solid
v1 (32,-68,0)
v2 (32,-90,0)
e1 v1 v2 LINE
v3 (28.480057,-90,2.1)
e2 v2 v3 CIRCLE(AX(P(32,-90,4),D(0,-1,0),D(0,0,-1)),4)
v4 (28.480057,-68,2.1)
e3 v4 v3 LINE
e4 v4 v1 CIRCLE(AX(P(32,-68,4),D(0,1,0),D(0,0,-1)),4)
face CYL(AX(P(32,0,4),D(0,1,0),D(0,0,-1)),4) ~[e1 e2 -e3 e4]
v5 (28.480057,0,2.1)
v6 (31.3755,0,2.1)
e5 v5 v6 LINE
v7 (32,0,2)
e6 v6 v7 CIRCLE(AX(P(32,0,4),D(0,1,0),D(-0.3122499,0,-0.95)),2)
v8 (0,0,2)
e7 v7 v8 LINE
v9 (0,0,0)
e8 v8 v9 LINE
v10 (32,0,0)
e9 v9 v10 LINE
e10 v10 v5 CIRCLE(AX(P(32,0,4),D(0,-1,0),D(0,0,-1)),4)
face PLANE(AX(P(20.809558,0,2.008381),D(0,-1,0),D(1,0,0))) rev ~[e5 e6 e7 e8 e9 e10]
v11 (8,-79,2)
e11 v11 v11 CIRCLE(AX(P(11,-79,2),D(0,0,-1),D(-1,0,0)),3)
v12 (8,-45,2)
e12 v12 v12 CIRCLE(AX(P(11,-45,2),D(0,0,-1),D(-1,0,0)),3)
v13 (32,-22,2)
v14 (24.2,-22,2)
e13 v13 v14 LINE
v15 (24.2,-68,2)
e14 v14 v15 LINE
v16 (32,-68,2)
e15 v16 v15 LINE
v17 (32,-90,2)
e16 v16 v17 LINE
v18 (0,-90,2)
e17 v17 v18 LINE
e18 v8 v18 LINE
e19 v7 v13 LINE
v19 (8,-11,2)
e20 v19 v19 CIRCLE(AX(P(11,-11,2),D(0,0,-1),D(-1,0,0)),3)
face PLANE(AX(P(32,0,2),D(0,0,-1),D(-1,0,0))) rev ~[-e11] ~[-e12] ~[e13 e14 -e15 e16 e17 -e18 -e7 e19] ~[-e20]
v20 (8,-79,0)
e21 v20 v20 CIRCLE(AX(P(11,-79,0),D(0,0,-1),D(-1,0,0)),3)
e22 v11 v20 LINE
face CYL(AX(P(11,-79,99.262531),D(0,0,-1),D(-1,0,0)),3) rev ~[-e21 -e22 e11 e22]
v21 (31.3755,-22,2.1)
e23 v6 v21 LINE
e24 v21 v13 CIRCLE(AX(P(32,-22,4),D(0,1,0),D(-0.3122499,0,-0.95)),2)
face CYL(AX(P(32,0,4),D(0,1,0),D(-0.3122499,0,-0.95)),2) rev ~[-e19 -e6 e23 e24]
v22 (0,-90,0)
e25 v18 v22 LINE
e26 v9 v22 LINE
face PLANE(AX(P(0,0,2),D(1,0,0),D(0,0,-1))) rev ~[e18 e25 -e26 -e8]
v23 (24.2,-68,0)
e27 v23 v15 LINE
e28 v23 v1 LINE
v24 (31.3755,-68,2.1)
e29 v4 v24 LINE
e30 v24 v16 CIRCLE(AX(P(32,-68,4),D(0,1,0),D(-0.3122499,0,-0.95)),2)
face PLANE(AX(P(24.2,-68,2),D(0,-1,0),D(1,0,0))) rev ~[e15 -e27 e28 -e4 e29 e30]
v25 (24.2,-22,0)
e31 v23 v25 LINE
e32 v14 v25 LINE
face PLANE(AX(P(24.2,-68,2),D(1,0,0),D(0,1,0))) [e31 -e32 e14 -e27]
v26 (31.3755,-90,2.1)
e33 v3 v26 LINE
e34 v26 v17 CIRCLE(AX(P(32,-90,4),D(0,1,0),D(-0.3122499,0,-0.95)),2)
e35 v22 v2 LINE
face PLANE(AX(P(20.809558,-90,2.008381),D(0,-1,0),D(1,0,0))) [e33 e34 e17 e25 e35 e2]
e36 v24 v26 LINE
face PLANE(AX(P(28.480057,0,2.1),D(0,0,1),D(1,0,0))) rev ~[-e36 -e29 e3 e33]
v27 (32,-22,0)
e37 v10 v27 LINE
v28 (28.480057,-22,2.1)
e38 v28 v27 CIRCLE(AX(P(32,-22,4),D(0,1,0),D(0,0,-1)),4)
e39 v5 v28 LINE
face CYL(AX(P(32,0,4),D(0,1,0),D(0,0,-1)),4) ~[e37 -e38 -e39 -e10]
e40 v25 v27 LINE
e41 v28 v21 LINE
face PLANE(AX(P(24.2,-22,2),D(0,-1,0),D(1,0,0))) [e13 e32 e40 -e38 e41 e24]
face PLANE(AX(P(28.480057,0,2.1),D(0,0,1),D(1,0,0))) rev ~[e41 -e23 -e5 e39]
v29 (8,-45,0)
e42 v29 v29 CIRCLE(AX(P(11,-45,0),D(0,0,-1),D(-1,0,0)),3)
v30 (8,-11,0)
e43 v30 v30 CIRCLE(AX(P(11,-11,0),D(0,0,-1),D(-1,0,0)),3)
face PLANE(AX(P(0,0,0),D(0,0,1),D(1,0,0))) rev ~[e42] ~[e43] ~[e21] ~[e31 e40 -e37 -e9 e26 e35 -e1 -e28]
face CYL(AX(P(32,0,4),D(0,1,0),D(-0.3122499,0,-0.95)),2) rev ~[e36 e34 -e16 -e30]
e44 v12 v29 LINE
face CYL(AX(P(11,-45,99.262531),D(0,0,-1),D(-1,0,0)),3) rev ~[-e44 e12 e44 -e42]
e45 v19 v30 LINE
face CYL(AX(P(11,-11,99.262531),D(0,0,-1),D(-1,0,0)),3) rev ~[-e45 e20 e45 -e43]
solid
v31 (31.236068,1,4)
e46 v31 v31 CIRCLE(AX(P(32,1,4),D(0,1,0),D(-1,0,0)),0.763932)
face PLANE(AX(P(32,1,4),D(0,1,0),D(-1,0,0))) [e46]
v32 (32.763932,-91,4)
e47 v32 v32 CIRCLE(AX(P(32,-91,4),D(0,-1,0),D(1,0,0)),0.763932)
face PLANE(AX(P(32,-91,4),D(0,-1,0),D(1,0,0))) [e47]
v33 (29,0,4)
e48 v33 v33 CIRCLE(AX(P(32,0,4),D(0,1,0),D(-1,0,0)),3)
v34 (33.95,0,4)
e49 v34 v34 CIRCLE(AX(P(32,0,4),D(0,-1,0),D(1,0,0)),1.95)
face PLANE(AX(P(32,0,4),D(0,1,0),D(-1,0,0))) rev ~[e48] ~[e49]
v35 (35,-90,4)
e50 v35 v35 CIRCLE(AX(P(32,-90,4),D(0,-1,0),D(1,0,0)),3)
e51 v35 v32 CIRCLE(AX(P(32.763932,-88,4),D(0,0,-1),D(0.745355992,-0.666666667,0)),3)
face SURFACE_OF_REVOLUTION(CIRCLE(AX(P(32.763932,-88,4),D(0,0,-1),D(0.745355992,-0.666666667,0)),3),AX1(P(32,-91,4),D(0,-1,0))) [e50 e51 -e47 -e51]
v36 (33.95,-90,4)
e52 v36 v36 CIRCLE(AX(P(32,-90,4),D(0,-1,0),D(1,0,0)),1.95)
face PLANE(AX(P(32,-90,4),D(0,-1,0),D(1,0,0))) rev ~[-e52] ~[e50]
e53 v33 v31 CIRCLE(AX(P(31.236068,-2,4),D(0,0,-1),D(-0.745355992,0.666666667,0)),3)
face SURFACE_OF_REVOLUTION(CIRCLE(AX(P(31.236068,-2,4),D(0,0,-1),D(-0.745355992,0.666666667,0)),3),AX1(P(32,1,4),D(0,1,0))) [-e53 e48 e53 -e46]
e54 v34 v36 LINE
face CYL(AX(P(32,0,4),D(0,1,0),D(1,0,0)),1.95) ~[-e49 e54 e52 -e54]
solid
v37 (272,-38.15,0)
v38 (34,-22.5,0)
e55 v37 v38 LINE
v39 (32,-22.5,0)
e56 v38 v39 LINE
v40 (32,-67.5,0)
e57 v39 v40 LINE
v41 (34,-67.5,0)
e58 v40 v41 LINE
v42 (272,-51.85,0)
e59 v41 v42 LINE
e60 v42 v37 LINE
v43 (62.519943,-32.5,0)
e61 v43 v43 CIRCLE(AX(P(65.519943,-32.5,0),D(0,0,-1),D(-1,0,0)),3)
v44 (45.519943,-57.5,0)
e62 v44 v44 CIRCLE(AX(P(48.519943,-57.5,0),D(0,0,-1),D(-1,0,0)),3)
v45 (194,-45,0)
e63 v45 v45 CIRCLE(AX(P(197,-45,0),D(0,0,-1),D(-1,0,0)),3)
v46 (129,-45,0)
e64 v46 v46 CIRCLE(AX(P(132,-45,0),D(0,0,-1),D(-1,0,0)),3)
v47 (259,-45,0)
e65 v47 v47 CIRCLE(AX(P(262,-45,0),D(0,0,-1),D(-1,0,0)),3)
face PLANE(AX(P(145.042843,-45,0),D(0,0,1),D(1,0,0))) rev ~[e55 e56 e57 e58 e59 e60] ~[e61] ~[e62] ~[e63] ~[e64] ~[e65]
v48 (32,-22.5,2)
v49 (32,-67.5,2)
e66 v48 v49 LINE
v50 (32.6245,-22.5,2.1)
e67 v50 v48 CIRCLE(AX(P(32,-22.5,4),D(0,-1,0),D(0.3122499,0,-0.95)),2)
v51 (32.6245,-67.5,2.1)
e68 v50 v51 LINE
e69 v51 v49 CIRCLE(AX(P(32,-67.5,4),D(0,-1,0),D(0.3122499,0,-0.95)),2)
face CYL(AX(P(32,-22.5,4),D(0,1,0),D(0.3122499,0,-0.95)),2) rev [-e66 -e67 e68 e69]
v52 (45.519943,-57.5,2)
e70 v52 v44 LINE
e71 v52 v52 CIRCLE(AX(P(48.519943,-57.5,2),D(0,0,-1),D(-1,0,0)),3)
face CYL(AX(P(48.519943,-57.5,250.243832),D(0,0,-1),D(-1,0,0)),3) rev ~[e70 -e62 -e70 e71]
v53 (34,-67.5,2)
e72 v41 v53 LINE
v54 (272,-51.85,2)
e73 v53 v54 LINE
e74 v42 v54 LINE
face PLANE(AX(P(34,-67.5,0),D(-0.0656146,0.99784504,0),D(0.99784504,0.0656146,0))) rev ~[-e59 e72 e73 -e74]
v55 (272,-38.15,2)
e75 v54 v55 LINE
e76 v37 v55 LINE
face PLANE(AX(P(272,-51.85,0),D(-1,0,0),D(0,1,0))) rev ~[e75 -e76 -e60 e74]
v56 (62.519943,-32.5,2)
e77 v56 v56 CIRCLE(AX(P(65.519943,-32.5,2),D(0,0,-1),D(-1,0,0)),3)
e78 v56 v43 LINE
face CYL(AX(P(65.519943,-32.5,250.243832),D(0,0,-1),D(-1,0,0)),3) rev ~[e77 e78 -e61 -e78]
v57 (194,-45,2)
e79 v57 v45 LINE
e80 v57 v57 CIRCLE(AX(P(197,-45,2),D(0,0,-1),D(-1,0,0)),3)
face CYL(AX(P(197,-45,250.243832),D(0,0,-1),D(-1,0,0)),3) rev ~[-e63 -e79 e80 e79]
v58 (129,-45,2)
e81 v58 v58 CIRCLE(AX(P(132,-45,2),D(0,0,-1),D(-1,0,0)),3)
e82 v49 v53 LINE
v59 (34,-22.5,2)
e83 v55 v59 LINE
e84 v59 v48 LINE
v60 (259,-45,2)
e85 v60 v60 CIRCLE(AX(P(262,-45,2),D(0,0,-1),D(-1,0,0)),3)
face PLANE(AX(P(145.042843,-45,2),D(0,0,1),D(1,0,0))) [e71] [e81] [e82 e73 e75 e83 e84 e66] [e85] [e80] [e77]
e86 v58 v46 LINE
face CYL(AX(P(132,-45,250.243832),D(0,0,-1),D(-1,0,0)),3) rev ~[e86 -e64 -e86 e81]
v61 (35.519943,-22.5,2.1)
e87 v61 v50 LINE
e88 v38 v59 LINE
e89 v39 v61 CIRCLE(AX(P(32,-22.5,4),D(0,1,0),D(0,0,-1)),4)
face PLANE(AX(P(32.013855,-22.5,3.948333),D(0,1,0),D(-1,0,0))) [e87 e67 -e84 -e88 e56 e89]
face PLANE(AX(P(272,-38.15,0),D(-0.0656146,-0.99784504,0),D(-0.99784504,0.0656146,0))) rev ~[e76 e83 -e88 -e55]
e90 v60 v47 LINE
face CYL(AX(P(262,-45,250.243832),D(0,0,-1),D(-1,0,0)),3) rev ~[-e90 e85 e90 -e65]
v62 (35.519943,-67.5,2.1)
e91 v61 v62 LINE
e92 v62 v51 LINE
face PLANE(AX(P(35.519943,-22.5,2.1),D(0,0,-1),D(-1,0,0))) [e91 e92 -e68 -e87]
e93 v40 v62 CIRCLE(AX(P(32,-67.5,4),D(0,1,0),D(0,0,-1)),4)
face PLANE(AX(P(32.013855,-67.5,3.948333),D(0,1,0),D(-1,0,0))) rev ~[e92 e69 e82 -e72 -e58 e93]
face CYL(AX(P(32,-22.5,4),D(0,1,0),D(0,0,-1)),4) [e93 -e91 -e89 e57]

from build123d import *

# Parameters (mm, degrees)
F2_DEPTH  = 90
F3_W      = 67.9701848628
F3_H      = 46
F4_DEPTH  = 12.5
F6_D      = 6
F7_R      = 1.95
F8_DEPTH  = 90
F9_R      = 3
F10_DEPTH = 1
F12_R     = 3
F13_DEPTH = 1
F16_DEPTH = 2
F18_DEPTH = 45
F20_D     = 6


# Not quite as in the source:
# - a fillet or chamfer that OpenCascade refuses, or shapes differently, is made with other operations: its cross-section is extruded or revolved along the edge and cut away or added


with BuildPart() as f2:
    # F1 (on Front) → F2 (new body)
    with BuildSketch(Plane.XZ):
        with BuildLine():
            Line((0, 2), (0, 0))
            Line((0, 0), (32, 0))
            ThreePointArc((32, 0), (34.0493901532, 7.4351128075), (28.4800568186, 2.1))
            Line((28.4800568186, 2.1), (31.3755002002, 2.1))
            ThreePointArc((31.3755002002, 2.1), (32.316227766, 5.9748417658), (32, 2))
            Line((32, 2), (0, 2))
        make_face()
    extrude(amount=F2_DEPTH)

    # F3 (on face) → F4 (cut, symmetric)
    with BuildSketch(Plane.XY.offset(2)):
        with Locations((58.1850924314, -45)):
            Rectangle(F3_W, F3_H)
    extrude(amount=F4_DEPTH, both=True, mode=Mode.SUBTRACT)

    # F6 (through all)
    with Locations(Plane.XY.offset(2)):
        with Locations((11, -11), (11, -45), (11, -79)):
            Hole(F6_D / 2)


with BuildPart() as f8:
    # F7 (on Front) → F8 (new body)
    with BuildSketch(Plane.XZ):
        with Locations((32, 4)):
            Circle(F7_R)
    extrude(amount=F8_DEPTH)

    # F9 (on face) → F10 (join)
    with BuildSketch(Plane(origin=(0, 0, 0), x_dir=(-1, 0, 0), z_dir=(0, 1, 0))):
        with Locations((-32, 4)):
            Circle(F9_R)
    extrude(amount=F10_DEPTH)

    # F11: fillet of radius 3 on 1 edges, made by hand

    # F11_s1 → F11_t2 (revolve, cut)
    with BuildSketch(Plane.XY.offset(4)):
        with BuildLine():
            ThreePointArc((29, 0), (30.0113231061, 0.7386127875), (31.2360679775, 1))
            Line((31.2360679775, 1), (29, 1))
            Line((29, 1), (29, 0))
        make_face()
    revolve(axis=Axis((32, 1, 4), (0, 1, 0)), mode=Mode.SUBTRACT)

    # F12 (on face) → F13 (join)
    with BuildSketch(Plane.XZ.offset(90)):
        with Locations((32, 4)):
            Circle(F12_R)
    extrude(amount=F13_DEPTH)

    # F14: fillet of radius 3 on 1 edges, made by hand

    # F14_s1 → F14_t2 (revolve, cut)
    with BuildSketch(Plane.XY.offset(4)):
        with BuildLine():
            ThreePointArc((35, -90), (33.9886768939, -90.7386127875), (32.7639320225, -91))
            Line((32.7639320225, -91), (35, -91))
            Line((35, -91), (35, -90))
        make_face()
    revolve(axis=Axis((32, -91, 4), (0, -1, 0)), mode=Mode.SUBTRACT)


with BuildPart() as f16:
    # F15 (on Top) → F16 (new body)
    with BuildSketch(Plane.XY):
        Polygon((272, -38.15), (34, -22.5), (32, -22.5), (32, -67.5), (34, -67.5), (272, -51.85), align=None)
    extrude(amount=F16_DEPTH)

    # F17 (on face) → F18 (join)
    with BuildSketch(Plane(origin=(0, -22.5, 0), x_dir=(-1, 0, 0), z_dir=(0, 1, 0))):
        with BuildLine():
            Line((-32, 2), (-32, 0))
            ThreePointArc((-32, 0), (-29.9506098468, 7.4351128075), (-35.5199431814, 2.1))
            Line((-35.5199431814, 2.1), (-32.6244997998, 2.1))
            ThreePointArc((-32.6244997998, 2.1), (-31.683772234, 5.9748417658), (-32, 2))
        make_face()
    extrude(amount=-F18_DEPTH)

    # F20 (through all)
    with Locations(Plane.XY.offset(2)):
        with Locations((48.5199431814, -57.5), (65.5199431814, -32.5), (197, -45), (132, -45), (262, -45)):
            Hole(F20_D / 2)


solid = Compound([f2.part, f8.part, f16.part])
